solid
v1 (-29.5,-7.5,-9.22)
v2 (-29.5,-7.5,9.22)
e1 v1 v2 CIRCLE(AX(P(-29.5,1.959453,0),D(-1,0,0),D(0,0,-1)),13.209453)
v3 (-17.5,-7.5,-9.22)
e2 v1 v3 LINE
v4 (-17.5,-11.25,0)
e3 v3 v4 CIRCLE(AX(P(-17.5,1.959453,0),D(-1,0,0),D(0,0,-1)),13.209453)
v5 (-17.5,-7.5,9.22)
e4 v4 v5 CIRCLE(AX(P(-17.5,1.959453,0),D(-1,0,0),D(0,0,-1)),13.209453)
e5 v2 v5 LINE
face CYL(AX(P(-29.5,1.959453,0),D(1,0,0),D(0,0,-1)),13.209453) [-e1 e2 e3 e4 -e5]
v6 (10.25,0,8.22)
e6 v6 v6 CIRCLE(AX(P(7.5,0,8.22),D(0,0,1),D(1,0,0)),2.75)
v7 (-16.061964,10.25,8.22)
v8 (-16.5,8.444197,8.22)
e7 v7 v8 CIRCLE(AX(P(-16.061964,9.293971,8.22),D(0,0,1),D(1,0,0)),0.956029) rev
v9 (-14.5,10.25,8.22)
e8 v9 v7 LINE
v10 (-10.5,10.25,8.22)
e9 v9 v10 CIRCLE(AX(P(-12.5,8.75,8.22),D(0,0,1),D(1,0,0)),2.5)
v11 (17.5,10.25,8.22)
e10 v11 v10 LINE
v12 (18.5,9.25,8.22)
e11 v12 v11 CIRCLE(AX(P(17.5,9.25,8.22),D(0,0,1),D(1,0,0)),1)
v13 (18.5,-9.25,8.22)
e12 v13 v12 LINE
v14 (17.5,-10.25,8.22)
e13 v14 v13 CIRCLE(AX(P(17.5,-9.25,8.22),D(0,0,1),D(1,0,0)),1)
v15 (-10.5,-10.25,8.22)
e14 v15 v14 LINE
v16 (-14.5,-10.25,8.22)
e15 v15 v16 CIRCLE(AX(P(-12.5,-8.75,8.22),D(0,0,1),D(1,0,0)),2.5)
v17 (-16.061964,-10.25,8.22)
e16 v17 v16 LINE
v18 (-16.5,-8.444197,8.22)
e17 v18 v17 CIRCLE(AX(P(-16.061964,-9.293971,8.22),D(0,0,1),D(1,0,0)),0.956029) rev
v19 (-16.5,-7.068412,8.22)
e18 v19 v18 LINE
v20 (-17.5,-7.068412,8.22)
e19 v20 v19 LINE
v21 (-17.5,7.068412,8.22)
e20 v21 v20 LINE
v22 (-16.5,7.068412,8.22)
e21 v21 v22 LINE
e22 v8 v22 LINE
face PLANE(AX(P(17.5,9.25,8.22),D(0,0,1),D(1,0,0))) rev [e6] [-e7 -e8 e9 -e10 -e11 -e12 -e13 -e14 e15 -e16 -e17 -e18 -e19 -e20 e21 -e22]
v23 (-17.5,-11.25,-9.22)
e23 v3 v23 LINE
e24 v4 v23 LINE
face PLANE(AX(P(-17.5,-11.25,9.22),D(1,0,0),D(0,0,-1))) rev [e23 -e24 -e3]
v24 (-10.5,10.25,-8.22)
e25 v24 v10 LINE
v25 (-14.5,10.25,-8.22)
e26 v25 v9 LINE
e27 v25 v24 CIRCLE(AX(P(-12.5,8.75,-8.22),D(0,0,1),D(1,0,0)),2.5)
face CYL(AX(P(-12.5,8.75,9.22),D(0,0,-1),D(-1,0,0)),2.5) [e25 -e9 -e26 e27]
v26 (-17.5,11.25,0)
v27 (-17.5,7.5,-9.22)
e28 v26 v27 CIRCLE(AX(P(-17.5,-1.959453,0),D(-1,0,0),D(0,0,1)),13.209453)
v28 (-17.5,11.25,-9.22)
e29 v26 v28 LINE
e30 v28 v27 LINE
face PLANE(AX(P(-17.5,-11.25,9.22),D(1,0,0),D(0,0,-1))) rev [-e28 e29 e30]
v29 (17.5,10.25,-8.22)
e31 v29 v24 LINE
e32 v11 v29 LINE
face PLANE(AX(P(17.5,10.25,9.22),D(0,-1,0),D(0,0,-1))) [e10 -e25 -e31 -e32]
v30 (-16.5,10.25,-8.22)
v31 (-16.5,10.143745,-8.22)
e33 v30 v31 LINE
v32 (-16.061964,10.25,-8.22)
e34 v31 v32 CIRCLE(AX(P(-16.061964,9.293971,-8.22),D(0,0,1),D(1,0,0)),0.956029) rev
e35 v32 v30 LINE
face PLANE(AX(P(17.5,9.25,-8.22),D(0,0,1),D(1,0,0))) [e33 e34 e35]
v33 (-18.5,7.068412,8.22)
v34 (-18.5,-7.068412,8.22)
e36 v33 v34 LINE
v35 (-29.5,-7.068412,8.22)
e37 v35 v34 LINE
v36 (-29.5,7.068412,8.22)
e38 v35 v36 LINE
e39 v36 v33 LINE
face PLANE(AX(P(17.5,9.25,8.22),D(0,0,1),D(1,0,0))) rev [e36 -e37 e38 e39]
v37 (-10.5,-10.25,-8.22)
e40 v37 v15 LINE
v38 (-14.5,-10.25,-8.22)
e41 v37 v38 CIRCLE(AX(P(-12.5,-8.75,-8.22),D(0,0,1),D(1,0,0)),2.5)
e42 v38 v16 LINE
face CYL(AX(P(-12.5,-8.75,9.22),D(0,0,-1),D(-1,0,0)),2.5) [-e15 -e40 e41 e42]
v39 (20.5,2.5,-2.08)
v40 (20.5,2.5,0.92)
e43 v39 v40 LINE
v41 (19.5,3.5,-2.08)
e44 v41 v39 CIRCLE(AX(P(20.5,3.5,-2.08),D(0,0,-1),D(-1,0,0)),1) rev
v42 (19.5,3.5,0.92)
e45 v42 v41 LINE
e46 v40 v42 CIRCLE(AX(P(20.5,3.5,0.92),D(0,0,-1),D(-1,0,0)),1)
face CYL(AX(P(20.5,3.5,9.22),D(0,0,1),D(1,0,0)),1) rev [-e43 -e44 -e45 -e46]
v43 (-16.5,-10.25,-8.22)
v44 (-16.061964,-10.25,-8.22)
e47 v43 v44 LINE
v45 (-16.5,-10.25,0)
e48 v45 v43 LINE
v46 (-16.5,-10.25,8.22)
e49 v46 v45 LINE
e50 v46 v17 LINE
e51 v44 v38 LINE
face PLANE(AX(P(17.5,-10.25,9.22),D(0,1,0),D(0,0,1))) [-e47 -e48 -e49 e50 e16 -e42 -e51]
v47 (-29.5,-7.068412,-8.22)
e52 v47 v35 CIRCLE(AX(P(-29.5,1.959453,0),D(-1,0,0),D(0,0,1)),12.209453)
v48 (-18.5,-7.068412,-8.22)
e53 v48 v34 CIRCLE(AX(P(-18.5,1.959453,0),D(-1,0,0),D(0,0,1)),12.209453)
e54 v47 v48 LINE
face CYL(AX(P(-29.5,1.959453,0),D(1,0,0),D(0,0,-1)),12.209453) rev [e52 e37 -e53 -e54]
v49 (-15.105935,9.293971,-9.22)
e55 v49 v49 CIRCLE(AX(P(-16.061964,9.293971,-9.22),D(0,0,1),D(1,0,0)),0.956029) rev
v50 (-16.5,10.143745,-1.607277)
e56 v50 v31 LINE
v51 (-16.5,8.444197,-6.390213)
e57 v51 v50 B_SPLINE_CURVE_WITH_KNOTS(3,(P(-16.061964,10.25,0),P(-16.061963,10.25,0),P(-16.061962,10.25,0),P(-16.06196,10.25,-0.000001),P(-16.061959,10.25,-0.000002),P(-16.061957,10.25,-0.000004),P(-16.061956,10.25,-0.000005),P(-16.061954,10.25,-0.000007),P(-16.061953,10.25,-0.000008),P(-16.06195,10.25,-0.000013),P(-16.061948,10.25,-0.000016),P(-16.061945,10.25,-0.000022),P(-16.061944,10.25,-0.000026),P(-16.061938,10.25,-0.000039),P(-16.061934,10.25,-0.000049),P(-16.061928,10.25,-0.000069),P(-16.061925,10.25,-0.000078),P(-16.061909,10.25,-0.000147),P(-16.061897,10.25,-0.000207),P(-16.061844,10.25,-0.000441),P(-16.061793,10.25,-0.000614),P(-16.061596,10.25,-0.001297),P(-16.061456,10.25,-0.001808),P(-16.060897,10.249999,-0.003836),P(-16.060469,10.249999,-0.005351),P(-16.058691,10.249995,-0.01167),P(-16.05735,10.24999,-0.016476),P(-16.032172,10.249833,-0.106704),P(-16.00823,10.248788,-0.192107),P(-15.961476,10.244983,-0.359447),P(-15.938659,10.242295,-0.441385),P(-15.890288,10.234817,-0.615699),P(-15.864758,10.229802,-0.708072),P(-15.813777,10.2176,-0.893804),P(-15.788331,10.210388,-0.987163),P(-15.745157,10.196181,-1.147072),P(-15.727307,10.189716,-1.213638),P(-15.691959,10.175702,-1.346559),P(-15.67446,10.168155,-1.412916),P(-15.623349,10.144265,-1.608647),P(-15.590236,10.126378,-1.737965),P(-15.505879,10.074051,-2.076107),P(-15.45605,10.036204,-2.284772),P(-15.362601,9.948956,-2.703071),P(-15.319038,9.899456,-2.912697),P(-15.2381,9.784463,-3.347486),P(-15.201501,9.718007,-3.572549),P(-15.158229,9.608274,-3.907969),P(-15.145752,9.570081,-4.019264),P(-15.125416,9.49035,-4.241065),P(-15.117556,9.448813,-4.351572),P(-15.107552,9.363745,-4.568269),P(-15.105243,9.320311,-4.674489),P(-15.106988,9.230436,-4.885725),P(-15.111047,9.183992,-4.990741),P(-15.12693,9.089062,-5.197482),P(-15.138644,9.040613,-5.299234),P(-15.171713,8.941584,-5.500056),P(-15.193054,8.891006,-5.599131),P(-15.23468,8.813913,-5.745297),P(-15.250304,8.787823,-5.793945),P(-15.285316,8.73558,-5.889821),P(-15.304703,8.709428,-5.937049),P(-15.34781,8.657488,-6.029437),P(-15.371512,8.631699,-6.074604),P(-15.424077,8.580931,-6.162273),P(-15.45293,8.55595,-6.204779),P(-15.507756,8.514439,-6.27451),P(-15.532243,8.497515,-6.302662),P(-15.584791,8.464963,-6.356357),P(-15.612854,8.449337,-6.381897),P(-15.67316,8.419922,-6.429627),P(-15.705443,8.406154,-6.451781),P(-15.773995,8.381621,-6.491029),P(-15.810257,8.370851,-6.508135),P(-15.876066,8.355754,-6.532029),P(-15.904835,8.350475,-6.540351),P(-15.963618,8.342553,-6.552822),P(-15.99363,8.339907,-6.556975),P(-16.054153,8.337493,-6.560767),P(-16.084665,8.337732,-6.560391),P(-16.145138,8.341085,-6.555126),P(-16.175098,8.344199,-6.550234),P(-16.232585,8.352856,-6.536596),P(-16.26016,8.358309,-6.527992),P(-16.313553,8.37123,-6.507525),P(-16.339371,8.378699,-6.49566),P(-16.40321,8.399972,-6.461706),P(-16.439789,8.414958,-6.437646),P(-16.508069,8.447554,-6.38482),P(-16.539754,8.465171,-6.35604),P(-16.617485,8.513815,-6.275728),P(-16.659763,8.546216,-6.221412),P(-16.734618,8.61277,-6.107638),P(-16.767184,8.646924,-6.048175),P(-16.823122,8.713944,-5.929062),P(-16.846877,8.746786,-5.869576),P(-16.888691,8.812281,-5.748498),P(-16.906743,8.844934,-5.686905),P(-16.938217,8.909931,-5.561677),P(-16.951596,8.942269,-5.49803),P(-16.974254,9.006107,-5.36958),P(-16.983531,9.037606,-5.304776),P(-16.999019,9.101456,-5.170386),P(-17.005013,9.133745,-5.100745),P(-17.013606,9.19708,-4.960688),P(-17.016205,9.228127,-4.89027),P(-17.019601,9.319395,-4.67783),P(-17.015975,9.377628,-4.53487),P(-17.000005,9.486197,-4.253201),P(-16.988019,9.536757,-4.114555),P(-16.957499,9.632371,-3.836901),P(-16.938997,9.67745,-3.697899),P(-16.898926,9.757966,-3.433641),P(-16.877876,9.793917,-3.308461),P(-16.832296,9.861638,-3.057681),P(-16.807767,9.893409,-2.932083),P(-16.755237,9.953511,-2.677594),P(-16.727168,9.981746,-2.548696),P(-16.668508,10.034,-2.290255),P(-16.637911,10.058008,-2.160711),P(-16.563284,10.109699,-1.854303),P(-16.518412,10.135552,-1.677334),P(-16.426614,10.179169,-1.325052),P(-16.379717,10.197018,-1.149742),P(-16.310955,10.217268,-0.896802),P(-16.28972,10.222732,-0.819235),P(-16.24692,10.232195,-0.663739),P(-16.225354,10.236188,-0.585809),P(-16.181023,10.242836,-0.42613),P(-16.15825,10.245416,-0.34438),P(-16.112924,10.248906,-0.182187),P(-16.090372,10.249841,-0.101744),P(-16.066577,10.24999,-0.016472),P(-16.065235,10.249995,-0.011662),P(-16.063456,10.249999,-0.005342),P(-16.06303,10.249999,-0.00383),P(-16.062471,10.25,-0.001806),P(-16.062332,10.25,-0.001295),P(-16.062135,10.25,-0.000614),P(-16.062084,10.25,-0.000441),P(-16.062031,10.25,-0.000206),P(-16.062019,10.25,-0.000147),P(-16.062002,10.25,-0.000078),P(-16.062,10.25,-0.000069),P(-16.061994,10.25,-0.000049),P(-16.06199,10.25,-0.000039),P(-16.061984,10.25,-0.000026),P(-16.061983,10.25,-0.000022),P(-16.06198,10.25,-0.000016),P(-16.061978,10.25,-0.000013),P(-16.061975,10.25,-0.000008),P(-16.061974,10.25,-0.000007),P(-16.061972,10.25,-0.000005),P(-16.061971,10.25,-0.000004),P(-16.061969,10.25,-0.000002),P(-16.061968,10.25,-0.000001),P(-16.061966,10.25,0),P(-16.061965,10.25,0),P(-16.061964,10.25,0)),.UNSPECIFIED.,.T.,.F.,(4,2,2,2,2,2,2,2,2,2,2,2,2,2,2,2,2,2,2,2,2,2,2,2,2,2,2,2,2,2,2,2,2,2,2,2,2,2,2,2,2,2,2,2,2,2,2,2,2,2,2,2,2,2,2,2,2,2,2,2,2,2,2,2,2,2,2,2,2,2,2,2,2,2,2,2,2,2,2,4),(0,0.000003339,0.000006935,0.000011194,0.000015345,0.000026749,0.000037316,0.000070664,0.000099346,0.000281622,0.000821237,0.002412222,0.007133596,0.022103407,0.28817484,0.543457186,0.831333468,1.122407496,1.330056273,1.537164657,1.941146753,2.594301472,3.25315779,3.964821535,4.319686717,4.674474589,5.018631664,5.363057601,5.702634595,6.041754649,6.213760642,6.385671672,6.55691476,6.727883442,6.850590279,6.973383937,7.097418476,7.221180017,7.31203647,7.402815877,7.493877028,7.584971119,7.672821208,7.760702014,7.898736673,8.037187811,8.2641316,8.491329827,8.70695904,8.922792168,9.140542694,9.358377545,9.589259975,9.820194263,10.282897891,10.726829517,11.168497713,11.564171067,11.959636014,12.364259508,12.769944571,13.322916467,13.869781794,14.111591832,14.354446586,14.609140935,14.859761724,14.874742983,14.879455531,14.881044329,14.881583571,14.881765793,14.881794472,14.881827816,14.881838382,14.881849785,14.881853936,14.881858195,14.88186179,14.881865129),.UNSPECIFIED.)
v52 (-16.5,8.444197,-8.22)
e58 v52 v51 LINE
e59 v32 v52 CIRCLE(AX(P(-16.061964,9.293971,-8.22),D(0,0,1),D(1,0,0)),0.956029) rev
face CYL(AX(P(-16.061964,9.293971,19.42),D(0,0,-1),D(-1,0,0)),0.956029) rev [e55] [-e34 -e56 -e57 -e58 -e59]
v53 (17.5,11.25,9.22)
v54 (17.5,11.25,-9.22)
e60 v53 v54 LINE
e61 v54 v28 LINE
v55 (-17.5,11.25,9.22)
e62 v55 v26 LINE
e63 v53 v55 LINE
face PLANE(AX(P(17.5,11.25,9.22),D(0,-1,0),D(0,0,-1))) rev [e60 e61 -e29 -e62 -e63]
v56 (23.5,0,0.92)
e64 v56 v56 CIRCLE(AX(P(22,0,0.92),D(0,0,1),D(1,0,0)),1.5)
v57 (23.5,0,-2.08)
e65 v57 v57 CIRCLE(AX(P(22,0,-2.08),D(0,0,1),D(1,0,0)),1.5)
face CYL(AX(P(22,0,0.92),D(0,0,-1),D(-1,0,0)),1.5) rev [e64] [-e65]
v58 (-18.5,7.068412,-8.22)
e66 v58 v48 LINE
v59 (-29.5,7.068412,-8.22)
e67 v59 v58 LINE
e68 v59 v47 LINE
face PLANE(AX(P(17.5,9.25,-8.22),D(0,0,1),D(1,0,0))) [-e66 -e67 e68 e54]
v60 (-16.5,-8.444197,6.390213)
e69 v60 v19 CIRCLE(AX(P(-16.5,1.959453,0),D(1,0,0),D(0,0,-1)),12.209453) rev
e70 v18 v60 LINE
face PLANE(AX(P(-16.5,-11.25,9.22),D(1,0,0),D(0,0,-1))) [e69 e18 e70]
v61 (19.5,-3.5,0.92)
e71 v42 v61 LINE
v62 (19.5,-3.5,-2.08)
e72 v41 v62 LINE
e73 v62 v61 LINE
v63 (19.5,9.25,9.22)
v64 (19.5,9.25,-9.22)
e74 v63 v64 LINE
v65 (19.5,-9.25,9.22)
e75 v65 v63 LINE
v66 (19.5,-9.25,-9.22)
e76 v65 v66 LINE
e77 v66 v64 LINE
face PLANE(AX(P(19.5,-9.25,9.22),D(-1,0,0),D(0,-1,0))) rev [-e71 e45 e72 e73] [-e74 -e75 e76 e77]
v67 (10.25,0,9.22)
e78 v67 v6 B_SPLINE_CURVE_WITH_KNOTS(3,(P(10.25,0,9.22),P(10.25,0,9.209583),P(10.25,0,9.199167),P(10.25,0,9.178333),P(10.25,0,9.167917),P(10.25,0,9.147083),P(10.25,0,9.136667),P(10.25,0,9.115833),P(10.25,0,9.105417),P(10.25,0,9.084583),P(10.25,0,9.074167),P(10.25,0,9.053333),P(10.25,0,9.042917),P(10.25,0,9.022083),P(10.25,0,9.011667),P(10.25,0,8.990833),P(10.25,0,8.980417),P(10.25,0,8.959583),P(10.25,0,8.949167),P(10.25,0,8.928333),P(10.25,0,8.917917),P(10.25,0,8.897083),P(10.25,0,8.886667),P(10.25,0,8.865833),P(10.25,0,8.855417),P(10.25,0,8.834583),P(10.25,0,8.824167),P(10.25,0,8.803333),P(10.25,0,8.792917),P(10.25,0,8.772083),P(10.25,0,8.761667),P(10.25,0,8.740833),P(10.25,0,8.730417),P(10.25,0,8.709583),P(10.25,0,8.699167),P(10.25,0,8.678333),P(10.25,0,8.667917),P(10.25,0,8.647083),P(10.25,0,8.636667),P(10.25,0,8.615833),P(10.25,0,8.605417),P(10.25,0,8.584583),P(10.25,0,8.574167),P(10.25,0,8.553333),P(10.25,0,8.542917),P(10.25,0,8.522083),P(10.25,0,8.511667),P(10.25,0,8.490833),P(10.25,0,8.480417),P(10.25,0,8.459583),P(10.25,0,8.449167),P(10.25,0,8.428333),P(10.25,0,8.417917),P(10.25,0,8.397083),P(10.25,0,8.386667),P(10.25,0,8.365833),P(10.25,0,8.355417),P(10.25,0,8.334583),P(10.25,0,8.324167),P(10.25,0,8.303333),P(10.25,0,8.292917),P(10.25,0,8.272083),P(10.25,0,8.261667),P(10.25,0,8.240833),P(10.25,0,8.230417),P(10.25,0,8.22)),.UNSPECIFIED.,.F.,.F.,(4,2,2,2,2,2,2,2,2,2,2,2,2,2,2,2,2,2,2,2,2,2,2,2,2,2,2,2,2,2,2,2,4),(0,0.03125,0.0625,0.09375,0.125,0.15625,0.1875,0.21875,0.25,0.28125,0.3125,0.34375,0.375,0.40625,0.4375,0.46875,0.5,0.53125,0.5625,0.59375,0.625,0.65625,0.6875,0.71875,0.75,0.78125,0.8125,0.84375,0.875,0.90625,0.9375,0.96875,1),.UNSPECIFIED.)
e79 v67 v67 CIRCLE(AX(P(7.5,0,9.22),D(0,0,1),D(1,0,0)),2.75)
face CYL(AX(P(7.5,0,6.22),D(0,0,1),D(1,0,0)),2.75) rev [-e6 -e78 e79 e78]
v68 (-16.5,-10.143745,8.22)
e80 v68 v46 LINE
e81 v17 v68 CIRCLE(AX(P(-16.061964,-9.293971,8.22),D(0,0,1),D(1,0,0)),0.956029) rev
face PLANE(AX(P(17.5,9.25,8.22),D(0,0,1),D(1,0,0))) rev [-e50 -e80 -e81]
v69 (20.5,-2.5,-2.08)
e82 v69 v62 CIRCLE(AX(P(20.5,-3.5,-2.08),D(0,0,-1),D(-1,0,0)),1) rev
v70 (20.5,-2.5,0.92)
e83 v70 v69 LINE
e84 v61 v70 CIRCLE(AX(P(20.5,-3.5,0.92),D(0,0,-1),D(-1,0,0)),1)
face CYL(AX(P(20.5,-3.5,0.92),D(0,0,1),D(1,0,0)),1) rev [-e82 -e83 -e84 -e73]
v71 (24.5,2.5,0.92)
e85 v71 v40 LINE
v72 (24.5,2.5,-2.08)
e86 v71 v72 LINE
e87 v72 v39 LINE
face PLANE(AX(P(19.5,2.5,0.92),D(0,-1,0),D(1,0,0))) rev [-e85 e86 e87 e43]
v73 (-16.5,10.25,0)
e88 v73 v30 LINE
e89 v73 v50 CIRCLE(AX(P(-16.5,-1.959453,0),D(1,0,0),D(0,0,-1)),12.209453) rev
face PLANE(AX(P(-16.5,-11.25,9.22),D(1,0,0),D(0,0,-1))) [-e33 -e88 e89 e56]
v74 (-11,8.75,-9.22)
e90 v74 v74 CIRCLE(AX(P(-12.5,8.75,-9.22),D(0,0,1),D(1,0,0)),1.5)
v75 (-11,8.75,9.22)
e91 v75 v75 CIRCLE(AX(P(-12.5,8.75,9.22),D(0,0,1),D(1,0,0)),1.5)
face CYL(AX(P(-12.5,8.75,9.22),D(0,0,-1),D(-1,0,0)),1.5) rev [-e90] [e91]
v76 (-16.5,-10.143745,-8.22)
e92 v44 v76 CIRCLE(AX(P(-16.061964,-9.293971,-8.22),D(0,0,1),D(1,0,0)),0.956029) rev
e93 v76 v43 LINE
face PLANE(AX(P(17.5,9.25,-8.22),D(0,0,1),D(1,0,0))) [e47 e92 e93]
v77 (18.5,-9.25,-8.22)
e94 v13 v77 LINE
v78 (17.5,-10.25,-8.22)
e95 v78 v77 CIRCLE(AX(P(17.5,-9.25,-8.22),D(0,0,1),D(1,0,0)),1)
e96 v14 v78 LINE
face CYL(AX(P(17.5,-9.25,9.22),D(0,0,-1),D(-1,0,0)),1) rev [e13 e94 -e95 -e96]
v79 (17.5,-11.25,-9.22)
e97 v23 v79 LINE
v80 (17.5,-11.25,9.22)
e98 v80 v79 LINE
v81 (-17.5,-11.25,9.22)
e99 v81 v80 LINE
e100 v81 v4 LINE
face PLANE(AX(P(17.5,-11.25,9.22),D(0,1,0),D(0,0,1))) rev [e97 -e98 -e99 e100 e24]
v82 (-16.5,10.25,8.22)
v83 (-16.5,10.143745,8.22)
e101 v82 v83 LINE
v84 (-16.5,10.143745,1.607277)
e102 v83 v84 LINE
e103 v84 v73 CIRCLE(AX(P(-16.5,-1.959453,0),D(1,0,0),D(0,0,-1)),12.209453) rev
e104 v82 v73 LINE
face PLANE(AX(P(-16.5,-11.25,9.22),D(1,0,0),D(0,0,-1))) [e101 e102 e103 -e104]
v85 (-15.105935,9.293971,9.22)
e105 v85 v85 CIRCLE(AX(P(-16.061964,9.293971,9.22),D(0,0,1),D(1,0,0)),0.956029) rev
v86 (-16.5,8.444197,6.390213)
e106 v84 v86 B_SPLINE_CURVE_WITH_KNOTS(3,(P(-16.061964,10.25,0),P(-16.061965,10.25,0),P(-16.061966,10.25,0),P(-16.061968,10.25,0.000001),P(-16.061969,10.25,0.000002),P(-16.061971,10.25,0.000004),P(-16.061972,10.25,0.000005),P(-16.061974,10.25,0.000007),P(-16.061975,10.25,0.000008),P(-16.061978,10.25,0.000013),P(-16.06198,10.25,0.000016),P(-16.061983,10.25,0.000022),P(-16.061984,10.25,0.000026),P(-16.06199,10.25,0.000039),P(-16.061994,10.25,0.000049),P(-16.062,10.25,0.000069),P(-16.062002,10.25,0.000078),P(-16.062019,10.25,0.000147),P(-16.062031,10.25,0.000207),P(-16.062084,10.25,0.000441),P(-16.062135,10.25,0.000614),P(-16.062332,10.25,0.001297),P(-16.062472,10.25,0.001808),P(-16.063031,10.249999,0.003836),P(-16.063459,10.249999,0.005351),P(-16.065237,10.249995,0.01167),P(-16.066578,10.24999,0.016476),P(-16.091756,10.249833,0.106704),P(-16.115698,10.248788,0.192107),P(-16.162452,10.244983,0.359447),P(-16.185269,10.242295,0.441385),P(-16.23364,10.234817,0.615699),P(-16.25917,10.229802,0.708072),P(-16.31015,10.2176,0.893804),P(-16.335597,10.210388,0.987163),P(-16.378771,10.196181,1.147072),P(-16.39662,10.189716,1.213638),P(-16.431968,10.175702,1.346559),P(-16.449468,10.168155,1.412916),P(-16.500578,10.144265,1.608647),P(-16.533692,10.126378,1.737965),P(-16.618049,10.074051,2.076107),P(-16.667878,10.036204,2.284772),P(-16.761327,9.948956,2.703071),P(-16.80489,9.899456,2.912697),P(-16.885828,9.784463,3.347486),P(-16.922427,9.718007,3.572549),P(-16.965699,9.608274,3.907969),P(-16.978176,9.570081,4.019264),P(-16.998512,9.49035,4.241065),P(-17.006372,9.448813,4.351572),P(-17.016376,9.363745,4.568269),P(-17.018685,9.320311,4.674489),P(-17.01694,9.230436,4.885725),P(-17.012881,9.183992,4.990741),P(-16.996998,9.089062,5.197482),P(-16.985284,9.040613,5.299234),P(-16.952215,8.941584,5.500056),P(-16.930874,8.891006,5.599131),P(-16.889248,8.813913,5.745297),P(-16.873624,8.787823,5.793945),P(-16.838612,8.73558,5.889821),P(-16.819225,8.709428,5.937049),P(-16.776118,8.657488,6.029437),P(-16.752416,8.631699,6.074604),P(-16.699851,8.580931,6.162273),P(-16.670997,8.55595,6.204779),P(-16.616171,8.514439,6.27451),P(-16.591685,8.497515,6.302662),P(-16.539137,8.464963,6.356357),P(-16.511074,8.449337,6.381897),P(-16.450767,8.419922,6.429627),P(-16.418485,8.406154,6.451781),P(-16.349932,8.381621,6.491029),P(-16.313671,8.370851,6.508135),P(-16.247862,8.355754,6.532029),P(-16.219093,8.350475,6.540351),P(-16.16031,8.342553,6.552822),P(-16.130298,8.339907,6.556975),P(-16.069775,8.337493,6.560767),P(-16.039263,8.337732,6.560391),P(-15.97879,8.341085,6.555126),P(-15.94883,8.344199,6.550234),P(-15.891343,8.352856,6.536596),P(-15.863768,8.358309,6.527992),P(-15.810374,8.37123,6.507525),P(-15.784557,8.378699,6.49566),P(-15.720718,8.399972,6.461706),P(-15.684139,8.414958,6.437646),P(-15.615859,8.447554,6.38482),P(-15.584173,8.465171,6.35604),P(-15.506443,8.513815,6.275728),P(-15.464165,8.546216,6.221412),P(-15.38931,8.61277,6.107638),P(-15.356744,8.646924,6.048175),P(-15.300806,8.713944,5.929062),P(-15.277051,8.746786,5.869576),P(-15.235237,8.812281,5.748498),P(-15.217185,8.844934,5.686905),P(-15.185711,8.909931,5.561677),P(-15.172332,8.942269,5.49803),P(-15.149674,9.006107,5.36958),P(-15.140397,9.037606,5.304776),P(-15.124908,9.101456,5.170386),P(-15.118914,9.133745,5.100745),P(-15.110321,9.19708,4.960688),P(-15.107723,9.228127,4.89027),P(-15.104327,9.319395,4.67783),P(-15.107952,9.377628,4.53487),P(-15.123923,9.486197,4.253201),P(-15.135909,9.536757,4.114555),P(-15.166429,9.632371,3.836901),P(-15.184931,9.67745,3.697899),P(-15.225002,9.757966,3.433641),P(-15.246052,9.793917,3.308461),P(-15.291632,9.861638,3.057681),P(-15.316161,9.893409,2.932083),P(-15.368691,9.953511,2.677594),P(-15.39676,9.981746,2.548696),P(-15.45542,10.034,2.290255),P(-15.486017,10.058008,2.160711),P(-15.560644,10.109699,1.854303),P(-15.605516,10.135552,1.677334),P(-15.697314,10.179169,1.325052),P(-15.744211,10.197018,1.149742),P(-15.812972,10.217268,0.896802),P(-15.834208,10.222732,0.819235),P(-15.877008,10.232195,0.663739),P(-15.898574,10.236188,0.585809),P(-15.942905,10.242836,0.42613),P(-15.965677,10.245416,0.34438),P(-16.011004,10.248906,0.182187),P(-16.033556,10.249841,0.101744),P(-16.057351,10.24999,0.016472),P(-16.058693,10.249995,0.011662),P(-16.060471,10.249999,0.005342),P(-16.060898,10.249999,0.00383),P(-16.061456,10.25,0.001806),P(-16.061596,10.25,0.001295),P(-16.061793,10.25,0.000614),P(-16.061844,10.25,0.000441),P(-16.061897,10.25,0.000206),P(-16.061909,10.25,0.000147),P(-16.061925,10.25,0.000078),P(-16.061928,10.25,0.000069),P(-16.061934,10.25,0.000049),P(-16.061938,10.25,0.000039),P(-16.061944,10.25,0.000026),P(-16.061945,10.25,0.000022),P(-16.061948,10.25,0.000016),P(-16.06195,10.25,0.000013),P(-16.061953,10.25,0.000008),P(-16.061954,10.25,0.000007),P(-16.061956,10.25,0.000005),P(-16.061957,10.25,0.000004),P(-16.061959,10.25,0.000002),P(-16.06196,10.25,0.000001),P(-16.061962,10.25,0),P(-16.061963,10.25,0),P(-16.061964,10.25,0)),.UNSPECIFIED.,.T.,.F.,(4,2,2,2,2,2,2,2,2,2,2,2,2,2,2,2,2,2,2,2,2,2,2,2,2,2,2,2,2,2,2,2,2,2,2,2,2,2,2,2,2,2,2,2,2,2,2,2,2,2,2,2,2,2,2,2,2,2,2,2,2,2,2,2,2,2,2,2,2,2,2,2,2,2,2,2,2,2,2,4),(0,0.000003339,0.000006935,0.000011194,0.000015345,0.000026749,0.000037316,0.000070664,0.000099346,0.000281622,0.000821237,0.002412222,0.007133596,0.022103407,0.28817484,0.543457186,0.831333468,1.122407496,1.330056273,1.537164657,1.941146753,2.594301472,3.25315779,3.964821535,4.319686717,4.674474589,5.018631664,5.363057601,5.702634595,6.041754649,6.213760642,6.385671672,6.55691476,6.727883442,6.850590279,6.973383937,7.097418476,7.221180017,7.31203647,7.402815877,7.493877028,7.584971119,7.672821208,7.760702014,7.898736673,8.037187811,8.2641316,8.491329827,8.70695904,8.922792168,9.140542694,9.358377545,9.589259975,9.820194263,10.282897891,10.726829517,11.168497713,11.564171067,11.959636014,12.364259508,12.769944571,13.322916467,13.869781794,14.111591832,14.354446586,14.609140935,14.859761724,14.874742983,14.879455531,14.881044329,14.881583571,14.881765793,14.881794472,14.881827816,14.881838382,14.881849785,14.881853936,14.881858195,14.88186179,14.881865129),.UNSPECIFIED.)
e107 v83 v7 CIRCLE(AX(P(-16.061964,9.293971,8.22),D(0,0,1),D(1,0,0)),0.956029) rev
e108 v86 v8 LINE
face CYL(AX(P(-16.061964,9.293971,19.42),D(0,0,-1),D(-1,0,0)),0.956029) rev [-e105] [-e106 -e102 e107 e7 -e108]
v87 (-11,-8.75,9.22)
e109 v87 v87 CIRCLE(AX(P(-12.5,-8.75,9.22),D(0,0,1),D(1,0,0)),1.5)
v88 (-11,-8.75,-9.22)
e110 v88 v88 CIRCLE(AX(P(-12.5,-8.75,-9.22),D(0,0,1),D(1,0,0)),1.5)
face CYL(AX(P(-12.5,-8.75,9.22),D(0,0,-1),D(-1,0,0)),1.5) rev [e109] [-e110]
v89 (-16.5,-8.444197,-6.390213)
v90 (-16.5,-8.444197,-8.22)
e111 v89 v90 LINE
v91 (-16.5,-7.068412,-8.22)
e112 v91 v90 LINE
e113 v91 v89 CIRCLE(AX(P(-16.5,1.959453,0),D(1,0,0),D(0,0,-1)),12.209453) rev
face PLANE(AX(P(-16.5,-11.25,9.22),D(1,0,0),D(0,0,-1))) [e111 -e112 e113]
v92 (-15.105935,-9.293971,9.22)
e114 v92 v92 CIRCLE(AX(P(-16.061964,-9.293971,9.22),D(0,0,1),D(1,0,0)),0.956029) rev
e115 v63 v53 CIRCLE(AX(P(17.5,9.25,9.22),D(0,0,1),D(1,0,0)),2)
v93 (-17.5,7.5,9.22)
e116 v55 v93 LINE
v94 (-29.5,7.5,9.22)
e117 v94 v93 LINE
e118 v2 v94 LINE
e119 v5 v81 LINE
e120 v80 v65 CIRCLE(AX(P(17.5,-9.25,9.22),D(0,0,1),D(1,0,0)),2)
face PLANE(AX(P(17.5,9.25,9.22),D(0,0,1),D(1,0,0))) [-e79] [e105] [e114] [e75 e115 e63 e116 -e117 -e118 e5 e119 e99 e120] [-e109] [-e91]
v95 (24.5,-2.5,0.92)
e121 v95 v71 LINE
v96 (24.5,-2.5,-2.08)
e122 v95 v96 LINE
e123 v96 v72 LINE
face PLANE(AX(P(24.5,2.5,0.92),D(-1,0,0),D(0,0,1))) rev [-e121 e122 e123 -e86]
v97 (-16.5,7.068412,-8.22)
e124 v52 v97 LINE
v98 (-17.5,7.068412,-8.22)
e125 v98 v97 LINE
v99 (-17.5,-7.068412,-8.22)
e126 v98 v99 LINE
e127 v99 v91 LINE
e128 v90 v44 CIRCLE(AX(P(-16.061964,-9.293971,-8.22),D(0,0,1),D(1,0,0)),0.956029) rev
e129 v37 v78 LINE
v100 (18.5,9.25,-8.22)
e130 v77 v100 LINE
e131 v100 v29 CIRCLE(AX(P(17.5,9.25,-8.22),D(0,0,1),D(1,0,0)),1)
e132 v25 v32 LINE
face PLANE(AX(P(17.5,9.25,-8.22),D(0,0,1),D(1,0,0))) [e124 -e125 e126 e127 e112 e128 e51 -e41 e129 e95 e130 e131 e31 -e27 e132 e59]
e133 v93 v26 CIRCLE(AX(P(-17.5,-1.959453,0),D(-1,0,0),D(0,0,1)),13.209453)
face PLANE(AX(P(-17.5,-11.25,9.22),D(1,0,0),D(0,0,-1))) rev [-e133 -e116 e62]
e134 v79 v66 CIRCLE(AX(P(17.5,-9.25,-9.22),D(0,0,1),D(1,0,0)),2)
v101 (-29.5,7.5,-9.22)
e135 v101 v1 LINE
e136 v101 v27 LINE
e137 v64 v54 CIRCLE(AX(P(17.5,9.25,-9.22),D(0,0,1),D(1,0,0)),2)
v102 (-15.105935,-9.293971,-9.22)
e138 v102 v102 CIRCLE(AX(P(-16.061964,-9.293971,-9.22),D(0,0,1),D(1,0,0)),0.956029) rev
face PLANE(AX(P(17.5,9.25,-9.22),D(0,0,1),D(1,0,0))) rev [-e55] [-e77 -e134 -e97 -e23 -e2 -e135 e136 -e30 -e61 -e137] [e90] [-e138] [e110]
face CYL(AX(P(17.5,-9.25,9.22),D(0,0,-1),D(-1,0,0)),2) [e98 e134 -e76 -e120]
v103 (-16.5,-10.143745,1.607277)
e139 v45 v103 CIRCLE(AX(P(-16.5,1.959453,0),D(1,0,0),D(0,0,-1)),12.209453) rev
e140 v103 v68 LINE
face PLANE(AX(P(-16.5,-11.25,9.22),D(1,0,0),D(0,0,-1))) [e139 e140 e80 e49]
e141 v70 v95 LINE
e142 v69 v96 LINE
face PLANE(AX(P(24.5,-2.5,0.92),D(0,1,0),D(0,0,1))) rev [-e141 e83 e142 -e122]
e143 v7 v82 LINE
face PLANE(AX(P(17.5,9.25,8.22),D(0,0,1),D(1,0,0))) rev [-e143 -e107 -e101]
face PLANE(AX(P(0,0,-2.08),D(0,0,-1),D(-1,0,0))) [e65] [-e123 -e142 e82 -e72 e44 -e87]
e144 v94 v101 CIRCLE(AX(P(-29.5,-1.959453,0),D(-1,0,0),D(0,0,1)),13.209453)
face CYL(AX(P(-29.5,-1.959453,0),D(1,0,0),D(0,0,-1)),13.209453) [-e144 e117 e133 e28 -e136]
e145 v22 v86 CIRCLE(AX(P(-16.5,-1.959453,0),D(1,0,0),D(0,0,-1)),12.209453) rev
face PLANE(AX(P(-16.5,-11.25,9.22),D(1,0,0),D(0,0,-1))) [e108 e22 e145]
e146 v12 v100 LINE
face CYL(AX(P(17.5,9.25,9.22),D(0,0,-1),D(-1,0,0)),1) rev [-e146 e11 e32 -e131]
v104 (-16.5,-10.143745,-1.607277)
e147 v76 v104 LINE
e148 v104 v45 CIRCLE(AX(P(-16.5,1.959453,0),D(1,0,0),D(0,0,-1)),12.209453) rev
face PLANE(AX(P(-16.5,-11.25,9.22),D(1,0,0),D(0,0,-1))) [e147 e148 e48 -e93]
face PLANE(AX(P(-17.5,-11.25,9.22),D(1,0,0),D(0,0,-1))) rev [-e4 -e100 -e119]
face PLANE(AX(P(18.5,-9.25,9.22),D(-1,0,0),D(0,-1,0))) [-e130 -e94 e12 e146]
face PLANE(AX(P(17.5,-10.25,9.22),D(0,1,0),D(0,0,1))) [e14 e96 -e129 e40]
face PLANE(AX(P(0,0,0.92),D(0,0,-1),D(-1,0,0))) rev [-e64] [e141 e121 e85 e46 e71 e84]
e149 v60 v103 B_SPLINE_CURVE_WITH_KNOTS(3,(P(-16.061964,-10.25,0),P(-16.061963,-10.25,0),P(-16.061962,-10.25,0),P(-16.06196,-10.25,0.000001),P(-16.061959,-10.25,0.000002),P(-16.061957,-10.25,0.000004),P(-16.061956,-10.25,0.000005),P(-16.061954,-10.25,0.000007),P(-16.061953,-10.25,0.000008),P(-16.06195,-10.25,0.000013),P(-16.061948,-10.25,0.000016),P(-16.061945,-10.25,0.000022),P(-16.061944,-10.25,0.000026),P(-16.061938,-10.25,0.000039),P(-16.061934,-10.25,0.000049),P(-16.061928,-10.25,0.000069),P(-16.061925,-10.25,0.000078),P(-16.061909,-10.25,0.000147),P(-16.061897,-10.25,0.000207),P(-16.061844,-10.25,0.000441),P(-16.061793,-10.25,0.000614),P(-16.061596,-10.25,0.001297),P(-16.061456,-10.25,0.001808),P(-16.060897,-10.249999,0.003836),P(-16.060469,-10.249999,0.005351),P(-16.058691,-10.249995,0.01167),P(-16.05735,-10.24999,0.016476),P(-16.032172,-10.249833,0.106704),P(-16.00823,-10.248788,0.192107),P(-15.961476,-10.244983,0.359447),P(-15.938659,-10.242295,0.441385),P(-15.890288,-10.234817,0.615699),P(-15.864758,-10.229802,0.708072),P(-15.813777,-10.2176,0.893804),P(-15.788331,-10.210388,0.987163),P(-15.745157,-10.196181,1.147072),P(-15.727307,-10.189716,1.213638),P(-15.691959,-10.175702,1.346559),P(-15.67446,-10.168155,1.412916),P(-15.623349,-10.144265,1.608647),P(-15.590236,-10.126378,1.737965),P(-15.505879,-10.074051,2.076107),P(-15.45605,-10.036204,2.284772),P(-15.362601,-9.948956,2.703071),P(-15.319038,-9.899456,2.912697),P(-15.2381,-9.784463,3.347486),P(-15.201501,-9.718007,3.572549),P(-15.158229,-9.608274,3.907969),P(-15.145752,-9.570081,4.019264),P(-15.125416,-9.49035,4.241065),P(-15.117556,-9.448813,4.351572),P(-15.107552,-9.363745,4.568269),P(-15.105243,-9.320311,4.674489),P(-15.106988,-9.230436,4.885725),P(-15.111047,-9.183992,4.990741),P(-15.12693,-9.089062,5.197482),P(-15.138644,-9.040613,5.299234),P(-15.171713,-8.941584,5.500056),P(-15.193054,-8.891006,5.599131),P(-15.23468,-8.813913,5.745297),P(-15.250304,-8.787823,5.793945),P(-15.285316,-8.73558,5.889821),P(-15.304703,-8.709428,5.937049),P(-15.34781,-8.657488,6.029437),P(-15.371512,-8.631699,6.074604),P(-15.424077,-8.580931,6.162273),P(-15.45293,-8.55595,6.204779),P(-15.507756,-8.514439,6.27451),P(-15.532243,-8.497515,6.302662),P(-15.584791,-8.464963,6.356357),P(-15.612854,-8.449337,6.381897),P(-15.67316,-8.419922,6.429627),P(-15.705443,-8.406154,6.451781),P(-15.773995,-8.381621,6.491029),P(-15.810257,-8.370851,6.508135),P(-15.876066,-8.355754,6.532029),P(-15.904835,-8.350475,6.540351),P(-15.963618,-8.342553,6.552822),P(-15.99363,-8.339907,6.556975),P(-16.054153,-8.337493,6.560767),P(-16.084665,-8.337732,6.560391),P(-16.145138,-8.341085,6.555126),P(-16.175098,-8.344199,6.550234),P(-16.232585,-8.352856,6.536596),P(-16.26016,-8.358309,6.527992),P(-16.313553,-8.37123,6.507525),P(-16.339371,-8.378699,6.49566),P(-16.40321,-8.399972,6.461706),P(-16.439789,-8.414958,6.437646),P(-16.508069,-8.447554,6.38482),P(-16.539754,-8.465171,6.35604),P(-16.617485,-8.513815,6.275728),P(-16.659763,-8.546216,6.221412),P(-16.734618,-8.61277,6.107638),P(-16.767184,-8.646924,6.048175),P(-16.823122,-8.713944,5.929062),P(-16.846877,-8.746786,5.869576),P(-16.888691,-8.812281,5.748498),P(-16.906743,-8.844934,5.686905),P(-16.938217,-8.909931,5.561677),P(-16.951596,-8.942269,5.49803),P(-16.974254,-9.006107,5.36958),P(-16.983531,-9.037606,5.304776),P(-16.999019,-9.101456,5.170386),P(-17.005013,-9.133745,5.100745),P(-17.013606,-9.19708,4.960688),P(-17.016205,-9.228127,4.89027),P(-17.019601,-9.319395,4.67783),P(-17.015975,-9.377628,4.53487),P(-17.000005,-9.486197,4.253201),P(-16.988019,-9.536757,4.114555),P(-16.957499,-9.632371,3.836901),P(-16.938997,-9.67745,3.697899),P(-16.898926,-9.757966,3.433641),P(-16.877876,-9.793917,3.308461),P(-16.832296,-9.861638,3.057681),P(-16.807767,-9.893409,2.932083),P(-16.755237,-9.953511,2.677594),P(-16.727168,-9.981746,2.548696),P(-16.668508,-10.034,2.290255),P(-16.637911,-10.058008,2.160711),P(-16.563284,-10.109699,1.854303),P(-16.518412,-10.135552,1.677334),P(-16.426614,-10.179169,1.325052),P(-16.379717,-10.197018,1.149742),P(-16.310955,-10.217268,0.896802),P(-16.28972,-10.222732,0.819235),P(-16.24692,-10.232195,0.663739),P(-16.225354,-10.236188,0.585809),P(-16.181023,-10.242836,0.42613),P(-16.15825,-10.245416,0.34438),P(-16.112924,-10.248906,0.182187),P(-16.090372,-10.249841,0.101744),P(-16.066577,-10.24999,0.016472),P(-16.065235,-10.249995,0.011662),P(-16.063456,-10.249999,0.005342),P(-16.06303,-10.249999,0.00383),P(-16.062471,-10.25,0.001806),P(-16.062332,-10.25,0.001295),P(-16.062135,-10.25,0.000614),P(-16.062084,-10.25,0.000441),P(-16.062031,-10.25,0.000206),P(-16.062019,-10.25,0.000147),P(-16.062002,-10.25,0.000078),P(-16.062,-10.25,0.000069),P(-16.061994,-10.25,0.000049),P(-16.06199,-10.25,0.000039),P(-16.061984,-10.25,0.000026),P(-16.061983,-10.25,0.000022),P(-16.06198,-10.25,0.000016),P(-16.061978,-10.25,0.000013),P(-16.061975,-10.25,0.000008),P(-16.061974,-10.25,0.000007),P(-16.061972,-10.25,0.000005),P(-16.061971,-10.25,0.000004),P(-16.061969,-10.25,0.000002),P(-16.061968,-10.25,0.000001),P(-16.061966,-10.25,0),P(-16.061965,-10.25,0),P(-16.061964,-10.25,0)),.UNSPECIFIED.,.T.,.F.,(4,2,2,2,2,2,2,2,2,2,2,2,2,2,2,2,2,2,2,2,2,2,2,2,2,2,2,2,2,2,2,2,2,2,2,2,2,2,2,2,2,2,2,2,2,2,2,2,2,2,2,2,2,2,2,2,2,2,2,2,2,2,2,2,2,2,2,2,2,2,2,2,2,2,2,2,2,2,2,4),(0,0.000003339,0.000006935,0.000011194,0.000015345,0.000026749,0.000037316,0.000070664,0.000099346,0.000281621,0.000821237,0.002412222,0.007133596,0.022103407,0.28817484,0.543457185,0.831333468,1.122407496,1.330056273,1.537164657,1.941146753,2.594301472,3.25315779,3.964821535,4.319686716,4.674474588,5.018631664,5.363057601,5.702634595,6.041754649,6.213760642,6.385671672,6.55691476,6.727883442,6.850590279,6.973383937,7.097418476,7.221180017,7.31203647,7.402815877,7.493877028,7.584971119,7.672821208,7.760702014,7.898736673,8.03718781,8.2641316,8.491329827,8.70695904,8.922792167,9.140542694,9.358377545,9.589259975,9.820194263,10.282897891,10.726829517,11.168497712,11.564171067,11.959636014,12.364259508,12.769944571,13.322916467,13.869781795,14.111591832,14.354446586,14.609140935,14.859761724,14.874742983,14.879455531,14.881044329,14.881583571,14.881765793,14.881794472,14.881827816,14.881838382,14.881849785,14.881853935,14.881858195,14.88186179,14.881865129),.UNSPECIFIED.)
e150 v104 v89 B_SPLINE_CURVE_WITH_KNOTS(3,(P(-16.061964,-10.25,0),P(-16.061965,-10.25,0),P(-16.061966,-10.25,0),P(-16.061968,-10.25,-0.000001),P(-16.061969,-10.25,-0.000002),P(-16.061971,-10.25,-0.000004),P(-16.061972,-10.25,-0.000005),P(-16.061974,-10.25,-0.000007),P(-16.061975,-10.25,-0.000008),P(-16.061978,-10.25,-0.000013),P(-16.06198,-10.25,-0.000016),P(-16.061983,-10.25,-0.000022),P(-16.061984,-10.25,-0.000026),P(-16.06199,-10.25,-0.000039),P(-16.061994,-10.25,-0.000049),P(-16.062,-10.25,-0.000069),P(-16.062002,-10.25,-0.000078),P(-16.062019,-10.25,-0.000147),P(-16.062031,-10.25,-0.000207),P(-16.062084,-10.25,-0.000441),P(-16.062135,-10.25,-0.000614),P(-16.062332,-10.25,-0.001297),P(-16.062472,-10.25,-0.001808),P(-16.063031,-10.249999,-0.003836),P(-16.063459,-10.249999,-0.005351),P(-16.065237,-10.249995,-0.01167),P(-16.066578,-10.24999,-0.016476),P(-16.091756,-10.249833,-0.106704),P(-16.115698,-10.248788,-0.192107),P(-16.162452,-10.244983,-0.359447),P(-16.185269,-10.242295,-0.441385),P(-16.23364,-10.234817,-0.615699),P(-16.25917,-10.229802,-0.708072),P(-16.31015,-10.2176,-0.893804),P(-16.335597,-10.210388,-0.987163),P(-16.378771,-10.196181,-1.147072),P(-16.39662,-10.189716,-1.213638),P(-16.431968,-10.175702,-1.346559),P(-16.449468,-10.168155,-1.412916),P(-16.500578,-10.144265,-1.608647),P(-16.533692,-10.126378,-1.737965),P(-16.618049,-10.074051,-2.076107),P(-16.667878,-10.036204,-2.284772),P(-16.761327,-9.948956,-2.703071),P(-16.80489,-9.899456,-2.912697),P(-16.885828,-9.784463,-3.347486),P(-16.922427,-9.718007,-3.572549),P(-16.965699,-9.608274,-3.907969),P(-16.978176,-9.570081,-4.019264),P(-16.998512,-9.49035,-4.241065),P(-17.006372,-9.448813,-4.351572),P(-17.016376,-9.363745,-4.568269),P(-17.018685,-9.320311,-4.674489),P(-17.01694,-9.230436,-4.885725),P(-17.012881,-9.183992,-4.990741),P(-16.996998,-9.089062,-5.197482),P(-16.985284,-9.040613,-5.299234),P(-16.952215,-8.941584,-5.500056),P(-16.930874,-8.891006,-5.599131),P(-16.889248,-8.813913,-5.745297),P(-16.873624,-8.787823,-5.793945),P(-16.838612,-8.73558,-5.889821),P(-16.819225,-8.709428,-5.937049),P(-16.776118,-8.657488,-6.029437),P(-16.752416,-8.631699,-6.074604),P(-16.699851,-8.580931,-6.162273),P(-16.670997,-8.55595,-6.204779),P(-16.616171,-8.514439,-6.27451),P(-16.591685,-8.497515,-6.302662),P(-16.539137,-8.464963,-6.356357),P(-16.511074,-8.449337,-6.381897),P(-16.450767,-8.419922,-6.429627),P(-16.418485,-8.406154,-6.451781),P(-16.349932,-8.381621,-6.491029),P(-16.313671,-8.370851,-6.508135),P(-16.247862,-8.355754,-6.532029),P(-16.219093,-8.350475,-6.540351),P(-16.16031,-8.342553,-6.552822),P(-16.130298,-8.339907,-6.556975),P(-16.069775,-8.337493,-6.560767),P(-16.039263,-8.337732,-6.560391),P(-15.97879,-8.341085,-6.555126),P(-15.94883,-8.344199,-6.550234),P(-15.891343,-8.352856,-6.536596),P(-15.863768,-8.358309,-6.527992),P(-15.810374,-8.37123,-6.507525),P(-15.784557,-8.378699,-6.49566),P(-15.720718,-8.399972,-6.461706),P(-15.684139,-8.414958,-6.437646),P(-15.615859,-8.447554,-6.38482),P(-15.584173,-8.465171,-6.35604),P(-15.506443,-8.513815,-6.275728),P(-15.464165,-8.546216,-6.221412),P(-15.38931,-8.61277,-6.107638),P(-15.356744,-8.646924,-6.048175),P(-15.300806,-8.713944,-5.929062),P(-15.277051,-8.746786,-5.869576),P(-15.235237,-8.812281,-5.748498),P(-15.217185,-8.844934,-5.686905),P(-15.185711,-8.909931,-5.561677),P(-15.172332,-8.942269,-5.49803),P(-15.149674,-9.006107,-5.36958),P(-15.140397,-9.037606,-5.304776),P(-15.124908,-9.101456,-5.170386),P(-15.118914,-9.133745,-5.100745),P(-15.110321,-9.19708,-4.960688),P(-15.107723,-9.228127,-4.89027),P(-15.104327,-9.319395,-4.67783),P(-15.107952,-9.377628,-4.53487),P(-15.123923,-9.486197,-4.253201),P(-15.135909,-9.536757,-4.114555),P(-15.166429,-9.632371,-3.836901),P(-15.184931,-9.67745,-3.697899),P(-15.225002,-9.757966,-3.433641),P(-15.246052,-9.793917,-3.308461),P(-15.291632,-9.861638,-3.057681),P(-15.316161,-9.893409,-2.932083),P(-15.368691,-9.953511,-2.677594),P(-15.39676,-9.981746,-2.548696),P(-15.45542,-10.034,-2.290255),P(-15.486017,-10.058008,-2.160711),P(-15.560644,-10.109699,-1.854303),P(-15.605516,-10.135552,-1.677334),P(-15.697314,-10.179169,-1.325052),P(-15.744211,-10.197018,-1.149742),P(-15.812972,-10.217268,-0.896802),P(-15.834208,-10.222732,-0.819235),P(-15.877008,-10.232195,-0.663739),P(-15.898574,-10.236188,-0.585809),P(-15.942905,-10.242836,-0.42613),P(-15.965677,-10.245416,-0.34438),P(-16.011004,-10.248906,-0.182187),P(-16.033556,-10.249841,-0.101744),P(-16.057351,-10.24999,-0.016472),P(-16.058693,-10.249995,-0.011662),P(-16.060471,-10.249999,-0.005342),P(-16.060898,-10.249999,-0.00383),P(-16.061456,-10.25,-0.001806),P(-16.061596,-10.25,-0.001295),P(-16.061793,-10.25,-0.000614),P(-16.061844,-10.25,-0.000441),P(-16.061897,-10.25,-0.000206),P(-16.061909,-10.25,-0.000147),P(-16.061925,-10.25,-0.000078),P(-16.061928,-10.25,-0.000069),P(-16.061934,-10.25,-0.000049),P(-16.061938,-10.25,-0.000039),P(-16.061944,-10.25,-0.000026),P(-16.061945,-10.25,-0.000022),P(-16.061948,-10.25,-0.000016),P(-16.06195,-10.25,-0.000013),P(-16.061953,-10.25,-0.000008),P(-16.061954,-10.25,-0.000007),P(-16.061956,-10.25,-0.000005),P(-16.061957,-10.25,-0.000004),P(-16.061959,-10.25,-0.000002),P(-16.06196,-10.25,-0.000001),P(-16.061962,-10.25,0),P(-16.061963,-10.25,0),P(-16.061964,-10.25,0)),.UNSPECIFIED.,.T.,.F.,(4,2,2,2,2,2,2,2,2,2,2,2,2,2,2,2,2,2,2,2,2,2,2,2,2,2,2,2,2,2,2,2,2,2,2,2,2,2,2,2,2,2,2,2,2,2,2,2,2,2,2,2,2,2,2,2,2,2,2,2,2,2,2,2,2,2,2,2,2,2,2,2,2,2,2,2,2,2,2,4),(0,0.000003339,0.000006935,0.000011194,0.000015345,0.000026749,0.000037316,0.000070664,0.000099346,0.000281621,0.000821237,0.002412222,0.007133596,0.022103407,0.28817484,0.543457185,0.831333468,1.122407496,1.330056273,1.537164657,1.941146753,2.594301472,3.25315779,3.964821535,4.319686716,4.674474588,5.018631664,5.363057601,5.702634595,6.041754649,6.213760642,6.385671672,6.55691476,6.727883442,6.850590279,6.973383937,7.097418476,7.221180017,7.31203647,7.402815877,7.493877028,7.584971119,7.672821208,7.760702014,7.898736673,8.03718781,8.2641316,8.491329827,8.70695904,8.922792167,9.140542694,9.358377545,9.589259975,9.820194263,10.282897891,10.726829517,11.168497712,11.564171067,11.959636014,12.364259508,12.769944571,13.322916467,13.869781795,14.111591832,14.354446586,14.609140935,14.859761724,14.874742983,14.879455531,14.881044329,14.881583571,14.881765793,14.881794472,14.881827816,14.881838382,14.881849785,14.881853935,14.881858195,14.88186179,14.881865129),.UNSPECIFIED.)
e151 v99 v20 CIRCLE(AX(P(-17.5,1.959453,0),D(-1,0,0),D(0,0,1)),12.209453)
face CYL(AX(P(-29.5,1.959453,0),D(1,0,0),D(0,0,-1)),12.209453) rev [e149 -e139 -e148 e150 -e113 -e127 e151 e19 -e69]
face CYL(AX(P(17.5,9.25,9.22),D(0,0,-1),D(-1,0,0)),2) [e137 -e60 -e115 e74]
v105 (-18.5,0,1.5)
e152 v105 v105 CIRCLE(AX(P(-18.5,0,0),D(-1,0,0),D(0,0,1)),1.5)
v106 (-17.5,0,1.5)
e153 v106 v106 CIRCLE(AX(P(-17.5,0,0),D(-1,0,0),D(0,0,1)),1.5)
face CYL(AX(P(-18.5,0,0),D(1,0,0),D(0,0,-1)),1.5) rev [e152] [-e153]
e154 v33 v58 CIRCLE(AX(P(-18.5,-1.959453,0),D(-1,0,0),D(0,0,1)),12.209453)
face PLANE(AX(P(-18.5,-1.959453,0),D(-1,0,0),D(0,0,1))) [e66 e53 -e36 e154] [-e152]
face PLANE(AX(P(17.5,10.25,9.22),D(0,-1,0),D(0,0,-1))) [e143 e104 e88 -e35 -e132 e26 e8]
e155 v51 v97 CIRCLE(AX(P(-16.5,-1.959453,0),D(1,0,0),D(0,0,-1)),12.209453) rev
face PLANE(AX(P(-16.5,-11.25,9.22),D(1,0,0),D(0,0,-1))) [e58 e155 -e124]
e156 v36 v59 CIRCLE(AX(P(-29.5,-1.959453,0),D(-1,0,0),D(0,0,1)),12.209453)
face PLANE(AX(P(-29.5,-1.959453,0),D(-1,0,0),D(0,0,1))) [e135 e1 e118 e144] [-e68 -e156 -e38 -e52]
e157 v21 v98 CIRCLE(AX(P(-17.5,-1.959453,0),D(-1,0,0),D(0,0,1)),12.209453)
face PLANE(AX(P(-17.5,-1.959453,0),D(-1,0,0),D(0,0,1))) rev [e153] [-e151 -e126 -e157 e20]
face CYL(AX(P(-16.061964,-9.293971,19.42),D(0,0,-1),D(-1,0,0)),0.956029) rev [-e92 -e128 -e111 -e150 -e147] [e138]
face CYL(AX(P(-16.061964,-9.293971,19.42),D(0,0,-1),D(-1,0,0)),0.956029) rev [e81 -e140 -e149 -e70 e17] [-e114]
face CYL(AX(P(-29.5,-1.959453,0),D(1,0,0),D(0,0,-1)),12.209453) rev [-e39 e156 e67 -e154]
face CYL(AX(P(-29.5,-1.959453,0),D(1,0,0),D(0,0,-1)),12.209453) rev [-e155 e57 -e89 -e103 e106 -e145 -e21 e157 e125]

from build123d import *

# Parameters (mm, degrees)
SKETCH1_R                = 1.5
BOSS_EXTRUDE1_DEPTH      = 9.22
BOSS_EXTRUDE2_DEPTH      = 12
SHELL1_START             = -10
SHELL1_OUTLINE_W         = 20.5
SHELL1_OUTLINE_H         = 16.44
SHELL1_DEPTH             = 27.5
SHELL1_START_2           = -29.5
SHELL1_2_DEPTH           = 14.5
SHELL1_START_3           = -16.5
SHELL1_3_DEPTH           = 1.5
SHELL1_START_4           = -8.22
SHELL1_4_DEPTH           = 16.44
SKETCH3_R                = 1.5
BOSS_EXTRUDE3_DEPTH      = 1
BOSS_EXTRUDE4_DEPTH      = 1.5
BOSS_EXTRUDE4_DEPTH_BACK = 1.5
SKETCH6_W                = 5
SKETCH6_H                = 5
SKETCH6_R                = 1.5
SKETCH7_R                = 2.75
CUT_EXTRUDE1_DEPTH       = 3
FILLET1_R                = 1
CUT_EXTRUDE2_DEPTH       = 20
CUT_EXTRUDE2_DEPTH_BACK  = 20
SKETCH8_R                = 0.956029162


with BuildPart() as part:
    # Sketch1 → Boss-Extrude1 (new, symmetric)
    with BuildSketch(Plane.XY):
        with BuildLine():
            Line((17.5, -11.25), (-17.5, -11.25))
            Line((-17.5, -11.25), (-17.5, 11.25))
            Line((-17.5, 11.25), (17.5, 11.25))
            ThreePointArc((17.5, 11.25), (18.914213562, 10.664213562), (19.5, 9.25))
            Line((19.5, 9.25), (19.5, -9.25))
            ThreePointArc((19.5, -9.25), (18.914213562, -10.664213562), (17.5, -11.25))
        make_face()
        with Locations((-12.5, 8.75)):
            Circle(SKETCH1_R, mode=Mode.SUBTRACT)
        with Locations((-12.5, -8.75)):
            Circle(SKETCH1_R, mode=Mode.SUBTRACT)
    extrude(amount=BOSS_EXTRUDE1_DEPTH, both=True)

    # Sketch2 → Boss-Extrude2 (add)
    with BuildSketch(Plane.ZY.offset(17.5)):
        with BuildLine():
            Line((9.22, -7.5), (9.22, 7.5))
            ThreePointArc((9.22, 7.5), (0, 11.25), (-9.22, 7.5))
            Line((-9.22, 7.5), (-9.22, -7.5))
            ThreePointArc((-9.22, -7.5), (0, -11.25), (9.22, -7.5))
        make_face()
    extrude(amount=BOSS_EXTRUDE2_DEPTH)

    # Shell1: read off the stored shape, not the designer's step
    # Shell1 outline → Shell1 (cut)
    with BuildSketch(Plane.YZ.offset(SHELL1_START)):
        Rectangle(SHELL1_OUTLINE_W, SHELL1_OUTLINE_H)
    extrude(amount=SHELL1_DEPTH, mode=Mode.SUBTRACT)

    # Shell1 2 outline → Shell1 2 (cut)
    with BuildSketch(Plane.YZ.offset(SHELL1_START_2)):
        with BuildLine():
            ThreePointArc((7.068411902, -8.22), (10.25, 0), (7.068411902, 8.22))
            Line((7.068411902, 8.22), (-7.068411902, 8.22))
            ThreePointArc((-7.068411902, 8.22), (-10.25, 0), (-7.068411902, -8.22))
            Line((-7.068411902, -8.22), (7.068411902, -8.22))
        make_face()
    extrude(amount=SHELL1_2_DEPTH, mode=Mode.SUBTRACT)

    # Shell1 3 outline → Shell1 3 (cut)
    with BuildSketch(Plane.YZ.offset(SHELL1_START_3)):
        with BuildLine():
            Line((10.25, 0), (10.25, 8.22))
            Line((10.25, 8.22), (7.068411902, 8.22))
            ThreePointArc((7.068411902, 8.22), (9.426855331, 4.407122157), (10.25, 0))
        make_face()
        with BuildLine():
            Line((10.25, -8.22), (10.25, 0))
            ThreePointArc((10.25, 0), (9.426855331, -4.407122157), (7.068411902, -8.22))
            Line((7.068411902, -8.22), (10.25, -8.22))
        make_face()
        with BuildLine():
            ThreePointArc((-10.25, 0), (-9.426855331, 4.407122157), (-7.068411902, 8.22))
            Line((-7.068411902, 8.22), (-10.25, 8.22))
            Line((-10.25, 8.22), (-10.25, 0))
        make_face()
        with BuildLine():
            Line((-10.25, -8.22), (-7.068411902, -8.22))
            ThreePointArc((-7.068411902, -8.22), (-9.426855331, -4.407122157), (-10.25, 0))
            Line((-10.25, 0), (-10.25, -8.22))
        make_face()
    extrude(amount=SHELL1_3_DEPTH, mode=Mode.SUBTRACT)

    # Shell1 4 outline → Shell1 4 (cut)
    with BuildSketch(Plane.XY.offset(SHELL1_START_4)):
        with BuildLine():
            ThreePointArc((-14.5, -10.25), (-14.871708245, -9.540569415), (-15, -8.75))
            Line((-15, -8.75), (-15, -10.25))
            Line((-15, -10.25), (-14.5, -10.25))
        make_face()
        with BuildLine():
            ThreePointArc((-10, 8.75), (-12.499999993, 6.25), (-15, 8.749999987))
            Line((-15, 8.749999987), (-15, -8.75))
            ThreePointArc((-15, -8.75), (-12.5, -6.25), (-10, -8.75))
            Line((-10, -8.75), (-10, 8.75))
        make_face()
        with BuildLine():
            Line((-14.5, 10.25), (-15, 10.25))
            Line((-15, 10.25), (-15, 8.749999987))
            ThreePointArc((-15, 8.749999987), (-14.871708247, 9.540569409), (-14.5, 10.25))
        make_face()
        with BuildLine():
            ThreePointArc((-10.5, 10.25), (-10.128291755, 9.540569415), (-10, 8.75))
            Line((-10, 8.75), (-10, 10.25))
            Line((-10, 10.25), (-10.5, 10.25))
        make_face()
        with BuildLine():
            Line((-10, -10.25), (-10, -8.75))
            ThreePointArc((-10, -8.75), (-10.128291755, -9.540569415), (-10.5, -10.25))
            Line((-10.5, -10.25), (-10, -10.25))
        make_face()
        with BuildLine():
            ThreePointArc((18.5, 9.25), (18.207106781, 9.957106781), (17.5, 10.25))
            Line((17.5, 10.25), (17.5, -10.25))
            ThreePointArc((17.5, -10.25), (18.207106781, -9.957106781), (18.5, -9.25))
            Line((18.5, -9.25), (18.5, 9.25))
        make_face()
    extrude(amount=SHELL1_4_DEPTH, mode=Mode.SUBTRACT)

    # Sketch3 → Boss-Extrude3 (add)
    with BuildSketch(Plane.ZY.offset(17.5)):
        with BuildLine():
            Line((-9.22, 7.5), (-9.22, -7.5))
            ThreePointArc((-9.22, -7.5), (0, -11.25), (9.22, -7.5))
            Line((9.22, -7.5), (9.22, 7.5))
            ThreePointArc((9.22, 7.5), (0, 11.25), (-9.22, 7.5))
        make_face()
        Circle(SKETCH3_R, mode=Mode.SUBTRACT)
    extrude(amount=BOSS_EXTRUDE3_DEPTH)

    # Sketch6 → Boss-Extrude4 (add, two sides: drawn at the far end of the back side and taken through both)
    with BuildSketch(Plane.XY.offset(-0.58).offset(-BOSS_EXTRUDE4_DEPTH_BACK)):
        with Locations((22, 0)):
            Rectangle(SKETCH6_W, SKETCH6_H)
        with Locations((22, 0)):
            Circle(SKETCH6_R, mode=Mode.SUBTRACT)
    extrude(amount=BOSS_EXTRUDE4_DEPTH + BOSS_EXTRUDE4_DEPTH_BACK)

    # Sketch7 → Cut-Extrude1 (cut)
    with BuildSketch(Plane.XY.offset(9.22)):
        with Locations((7.5, 0)):
            Circle(SKETCH7_R)
    extrude(amount=-CUT_EXTRUDE1_DEPTH, mode=Mode.SUBTRACT)

    # Fillet1
    fillet1_edges = [part.edges().sort_by_distance(p)[0] for p in [
        (19.5, 2.5, -0.58),
        (19.5, -2.5, -0.58),
    ]]
    fillet(fillet1_edges, radius=FILLET1_R)

    # Sketch8 → Cut-Extrude2 (cut, two sides: drawn at the far end of the back side and taken through both)
    with BuildSketch(Plane.XY.offset(-0.58).offset(-CUT_EXTRUDE2_DEPTH_BACK)):
        with Locations(Location((-16.061963922, 9.293970838, 0), (0, 0, 242.73008166))):
            Circle(SKETCH8_R)
        with Locations(Location((-16.061963922, -9.293970838, 0), (0, 0, 242.730056197))):
            Circle(SKETCH8_R)
    extrude(amount=CUT_EXTRUDE2_DEPTH + CUT_EXTRUDE2_DEPTH_BACK, mode=Mode.SUBTRACT)


solid = part.part
